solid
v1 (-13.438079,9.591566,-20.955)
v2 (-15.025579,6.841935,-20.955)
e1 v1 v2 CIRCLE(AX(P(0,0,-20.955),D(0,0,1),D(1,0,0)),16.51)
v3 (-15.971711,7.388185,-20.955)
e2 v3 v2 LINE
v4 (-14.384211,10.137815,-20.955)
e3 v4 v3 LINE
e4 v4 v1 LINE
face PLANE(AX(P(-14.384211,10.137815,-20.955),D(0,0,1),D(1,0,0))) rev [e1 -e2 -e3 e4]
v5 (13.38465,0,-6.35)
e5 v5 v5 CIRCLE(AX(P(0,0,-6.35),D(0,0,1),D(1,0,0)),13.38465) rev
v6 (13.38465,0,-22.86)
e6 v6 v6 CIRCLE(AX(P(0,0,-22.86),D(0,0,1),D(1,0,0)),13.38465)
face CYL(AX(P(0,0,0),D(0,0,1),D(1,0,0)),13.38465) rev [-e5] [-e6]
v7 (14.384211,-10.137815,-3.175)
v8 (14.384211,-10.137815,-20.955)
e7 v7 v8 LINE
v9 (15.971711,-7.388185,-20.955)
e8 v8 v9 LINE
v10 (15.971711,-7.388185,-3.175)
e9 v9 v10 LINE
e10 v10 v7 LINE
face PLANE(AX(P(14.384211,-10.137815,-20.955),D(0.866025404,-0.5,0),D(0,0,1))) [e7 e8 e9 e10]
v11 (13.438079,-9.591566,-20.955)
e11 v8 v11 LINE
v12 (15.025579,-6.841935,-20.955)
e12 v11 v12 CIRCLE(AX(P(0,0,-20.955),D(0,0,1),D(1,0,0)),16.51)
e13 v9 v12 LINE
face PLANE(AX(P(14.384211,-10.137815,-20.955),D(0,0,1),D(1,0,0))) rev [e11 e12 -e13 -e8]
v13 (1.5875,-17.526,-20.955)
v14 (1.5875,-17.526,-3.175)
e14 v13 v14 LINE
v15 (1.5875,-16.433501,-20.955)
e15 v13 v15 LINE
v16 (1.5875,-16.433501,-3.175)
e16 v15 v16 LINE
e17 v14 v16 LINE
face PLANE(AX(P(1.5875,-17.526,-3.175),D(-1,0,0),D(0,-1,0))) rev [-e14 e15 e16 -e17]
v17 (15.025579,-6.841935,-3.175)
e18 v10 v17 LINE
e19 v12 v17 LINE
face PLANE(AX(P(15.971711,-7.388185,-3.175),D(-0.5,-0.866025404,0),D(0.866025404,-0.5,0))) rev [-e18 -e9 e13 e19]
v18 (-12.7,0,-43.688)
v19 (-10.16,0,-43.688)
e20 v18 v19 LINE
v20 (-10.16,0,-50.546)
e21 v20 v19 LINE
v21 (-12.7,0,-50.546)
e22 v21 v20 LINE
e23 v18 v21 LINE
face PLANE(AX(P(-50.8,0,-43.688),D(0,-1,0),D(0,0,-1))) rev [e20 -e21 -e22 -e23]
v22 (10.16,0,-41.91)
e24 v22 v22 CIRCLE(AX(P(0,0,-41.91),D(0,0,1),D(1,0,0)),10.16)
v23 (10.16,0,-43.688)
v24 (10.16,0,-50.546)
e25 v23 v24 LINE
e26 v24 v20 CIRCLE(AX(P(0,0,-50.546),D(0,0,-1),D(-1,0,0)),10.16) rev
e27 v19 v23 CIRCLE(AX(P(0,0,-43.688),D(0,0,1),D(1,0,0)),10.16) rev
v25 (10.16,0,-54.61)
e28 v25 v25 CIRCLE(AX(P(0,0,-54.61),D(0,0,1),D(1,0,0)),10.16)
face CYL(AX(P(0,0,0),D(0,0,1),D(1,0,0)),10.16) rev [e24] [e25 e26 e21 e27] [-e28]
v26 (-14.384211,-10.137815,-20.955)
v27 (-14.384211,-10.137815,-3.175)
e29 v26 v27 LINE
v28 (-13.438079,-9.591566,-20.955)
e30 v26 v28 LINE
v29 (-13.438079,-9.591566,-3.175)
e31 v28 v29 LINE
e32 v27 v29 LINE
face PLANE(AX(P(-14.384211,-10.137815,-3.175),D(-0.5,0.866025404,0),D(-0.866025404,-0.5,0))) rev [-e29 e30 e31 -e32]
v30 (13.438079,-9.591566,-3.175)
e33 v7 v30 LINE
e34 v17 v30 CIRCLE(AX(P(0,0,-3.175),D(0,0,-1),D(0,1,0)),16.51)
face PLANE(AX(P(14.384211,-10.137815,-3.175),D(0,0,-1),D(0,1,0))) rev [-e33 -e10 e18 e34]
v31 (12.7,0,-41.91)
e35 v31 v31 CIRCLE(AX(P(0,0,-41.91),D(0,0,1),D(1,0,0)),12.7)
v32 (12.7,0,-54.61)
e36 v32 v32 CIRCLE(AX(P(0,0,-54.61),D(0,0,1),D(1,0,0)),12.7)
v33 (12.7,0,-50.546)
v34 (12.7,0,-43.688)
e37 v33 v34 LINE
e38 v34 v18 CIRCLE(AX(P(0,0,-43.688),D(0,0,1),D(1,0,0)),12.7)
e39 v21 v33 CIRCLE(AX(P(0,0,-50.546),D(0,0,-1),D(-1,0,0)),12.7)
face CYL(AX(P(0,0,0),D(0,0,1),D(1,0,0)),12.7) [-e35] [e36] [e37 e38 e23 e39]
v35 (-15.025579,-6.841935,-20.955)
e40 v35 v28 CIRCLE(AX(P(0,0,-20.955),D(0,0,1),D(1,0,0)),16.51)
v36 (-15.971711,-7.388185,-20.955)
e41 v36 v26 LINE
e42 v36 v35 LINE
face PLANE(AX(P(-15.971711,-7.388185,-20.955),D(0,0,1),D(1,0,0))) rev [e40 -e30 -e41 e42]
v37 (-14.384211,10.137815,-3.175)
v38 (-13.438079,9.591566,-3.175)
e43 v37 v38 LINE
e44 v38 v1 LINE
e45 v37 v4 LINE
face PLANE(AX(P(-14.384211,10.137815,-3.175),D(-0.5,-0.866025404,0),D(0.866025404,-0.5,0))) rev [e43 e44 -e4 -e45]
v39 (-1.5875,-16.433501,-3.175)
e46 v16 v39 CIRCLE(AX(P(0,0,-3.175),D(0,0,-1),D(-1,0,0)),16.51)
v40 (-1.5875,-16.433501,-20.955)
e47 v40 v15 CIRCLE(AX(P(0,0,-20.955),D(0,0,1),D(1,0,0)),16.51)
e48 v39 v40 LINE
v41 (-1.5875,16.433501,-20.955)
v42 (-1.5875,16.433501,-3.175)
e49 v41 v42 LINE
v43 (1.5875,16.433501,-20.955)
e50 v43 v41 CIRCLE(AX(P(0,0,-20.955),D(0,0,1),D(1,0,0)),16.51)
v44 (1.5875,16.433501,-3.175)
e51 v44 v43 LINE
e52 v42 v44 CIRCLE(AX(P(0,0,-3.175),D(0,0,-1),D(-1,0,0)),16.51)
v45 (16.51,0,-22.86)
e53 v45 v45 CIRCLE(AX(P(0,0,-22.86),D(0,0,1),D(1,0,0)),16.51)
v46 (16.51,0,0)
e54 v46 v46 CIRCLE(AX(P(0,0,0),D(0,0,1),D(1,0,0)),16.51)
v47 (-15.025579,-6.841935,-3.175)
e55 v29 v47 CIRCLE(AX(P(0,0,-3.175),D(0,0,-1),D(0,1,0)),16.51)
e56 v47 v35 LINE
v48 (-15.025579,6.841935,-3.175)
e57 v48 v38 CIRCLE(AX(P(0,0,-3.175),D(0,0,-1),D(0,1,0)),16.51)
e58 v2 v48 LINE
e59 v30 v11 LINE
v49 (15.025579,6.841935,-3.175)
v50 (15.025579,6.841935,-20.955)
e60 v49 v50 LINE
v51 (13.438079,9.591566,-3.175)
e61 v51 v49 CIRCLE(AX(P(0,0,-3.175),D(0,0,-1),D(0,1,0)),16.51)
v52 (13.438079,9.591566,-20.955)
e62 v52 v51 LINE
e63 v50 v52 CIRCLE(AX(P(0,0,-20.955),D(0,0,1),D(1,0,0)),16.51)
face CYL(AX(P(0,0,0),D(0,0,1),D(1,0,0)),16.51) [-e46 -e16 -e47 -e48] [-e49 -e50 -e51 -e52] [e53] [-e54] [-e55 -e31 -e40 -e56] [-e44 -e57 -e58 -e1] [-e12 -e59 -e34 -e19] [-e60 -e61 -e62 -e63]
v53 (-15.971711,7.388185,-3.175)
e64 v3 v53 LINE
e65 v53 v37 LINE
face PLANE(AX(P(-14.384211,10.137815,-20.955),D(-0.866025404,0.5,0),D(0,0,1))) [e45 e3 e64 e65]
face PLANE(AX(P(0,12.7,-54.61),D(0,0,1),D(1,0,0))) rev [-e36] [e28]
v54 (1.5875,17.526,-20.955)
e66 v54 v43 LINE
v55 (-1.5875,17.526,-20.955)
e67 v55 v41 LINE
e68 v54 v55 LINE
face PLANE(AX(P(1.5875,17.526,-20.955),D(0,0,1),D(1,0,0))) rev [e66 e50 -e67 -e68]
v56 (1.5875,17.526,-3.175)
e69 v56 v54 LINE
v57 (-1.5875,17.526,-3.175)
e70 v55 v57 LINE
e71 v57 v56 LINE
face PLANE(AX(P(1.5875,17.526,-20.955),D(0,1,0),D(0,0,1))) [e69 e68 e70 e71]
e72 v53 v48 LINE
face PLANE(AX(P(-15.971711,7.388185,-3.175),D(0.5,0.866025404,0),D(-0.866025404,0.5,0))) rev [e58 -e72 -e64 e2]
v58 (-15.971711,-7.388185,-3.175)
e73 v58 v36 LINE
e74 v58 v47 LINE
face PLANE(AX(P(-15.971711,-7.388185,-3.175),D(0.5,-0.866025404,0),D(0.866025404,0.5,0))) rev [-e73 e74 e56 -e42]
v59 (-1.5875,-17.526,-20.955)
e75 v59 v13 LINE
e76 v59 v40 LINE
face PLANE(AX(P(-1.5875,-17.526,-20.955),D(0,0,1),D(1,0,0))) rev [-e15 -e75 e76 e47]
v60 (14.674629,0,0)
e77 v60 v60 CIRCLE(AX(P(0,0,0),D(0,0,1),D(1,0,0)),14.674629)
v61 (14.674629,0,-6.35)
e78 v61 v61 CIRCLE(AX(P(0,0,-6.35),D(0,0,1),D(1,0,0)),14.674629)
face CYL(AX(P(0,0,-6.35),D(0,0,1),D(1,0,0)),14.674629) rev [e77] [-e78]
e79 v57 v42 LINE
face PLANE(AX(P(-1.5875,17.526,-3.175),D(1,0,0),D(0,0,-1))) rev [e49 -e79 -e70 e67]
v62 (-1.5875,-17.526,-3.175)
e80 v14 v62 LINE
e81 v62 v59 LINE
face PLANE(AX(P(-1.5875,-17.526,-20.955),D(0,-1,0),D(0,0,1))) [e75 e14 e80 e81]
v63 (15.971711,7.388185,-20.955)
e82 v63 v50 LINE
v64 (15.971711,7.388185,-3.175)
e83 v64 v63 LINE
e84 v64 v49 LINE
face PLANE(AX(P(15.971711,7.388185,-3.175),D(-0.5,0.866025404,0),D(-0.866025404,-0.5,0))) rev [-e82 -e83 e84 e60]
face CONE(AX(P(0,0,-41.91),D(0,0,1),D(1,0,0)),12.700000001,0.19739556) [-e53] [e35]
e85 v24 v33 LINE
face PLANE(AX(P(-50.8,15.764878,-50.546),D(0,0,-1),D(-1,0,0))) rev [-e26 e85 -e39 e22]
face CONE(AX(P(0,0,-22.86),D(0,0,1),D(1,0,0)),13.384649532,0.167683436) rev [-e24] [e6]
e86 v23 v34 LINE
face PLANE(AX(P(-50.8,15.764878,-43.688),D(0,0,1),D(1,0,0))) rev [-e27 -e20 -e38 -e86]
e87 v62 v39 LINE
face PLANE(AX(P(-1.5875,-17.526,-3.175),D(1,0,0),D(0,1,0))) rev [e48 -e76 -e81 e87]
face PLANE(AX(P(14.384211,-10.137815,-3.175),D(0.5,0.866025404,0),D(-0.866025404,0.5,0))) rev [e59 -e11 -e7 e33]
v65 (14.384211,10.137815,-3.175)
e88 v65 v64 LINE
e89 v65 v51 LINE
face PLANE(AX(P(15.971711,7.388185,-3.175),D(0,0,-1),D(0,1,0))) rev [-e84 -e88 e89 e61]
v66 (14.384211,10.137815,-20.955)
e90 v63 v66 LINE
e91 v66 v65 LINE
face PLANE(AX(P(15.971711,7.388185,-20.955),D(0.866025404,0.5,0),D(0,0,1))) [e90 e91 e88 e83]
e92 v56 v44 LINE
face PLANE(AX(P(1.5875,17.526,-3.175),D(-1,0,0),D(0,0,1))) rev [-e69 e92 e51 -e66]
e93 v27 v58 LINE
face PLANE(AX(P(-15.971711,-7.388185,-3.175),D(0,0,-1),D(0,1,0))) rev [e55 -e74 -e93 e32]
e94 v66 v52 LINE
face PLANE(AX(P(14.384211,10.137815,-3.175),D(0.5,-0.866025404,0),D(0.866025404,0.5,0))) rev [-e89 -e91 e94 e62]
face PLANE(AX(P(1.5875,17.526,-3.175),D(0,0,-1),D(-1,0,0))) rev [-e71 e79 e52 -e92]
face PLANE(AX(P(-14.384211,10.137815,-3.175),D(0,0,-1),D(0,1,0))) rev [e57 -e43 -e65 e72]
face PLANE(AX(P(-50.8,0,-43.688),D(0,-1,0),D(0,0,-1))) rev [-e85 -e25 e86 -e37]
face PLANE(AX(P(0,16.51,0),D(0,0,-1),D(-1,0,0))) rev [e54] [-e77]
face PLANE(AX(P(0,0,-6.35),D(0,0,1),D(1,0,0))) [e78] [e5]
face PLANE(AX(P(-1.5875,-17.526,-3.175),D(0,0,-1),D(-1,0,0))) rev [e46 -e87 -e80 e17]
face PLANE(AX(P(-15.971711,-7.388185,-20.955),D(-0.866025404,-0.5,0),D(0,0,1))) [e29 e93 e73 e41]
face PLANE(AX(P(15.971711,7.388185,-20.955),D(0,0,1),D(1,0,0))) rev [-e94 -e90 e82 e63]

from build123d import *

# Parameters (mm, degrees)
SKETCH3_R          = 14.674629281
CUT_EXTRUDE1_DEPTH = 6.35
SKETCH4_W          = 6.858
SKETCH4_H          = 15.764878236
CUT_EXTRUDE2_DEPTH = 50.8
SKETCH7_W          = 3.175
SKETCH7_H          = 17.78
FINGERGRIP_DEPTH   = 1.651
GRIPS_START        = -20.955
GRIPS_DEPTH        = 17.78


# Read off the part's stored shape, not the designer's step: grips
with BuildPart() as part:
    # Sketch1 → Revolve3 (revolve)
    with BuildSketch(Plane(origin=(0, 0, 0), x_dir=(0, 0, -1), z_dir=(1, 0, 0)), mode=Mode.PRIVATE) as revolve3_sk:
        Polygon((54.61, 12.700000001), (54.61, 10.16), (41.91, 10.16), (22.86, 13.384649532), (0, 13.384649532), (0, 16.51), (22.86, 16.51), (41.91, 12.700000001), align=None)
    revolve(revolve3_sk.sketch.rotate(Axis((0, 0, 0), (0, 0, -1)), 90), axis=Axis((0, 0, 0), (0, 0, -1)))

    # Sketch3 → Cut-Extrude1 (cut)
    with BuildSketch(Plane.XY):
        Circle(SKETCH3_R)
    extrude(amount=-CUT_EXTRUDE1_DEPTH, mode=Mode.SUBTRACT)

    # Sketch4 → Cut-Extrude2 (cut, symmetric)
    with BuildSketch(Plane(origin=(0, 0, 0), x_dir=(0, 0, -1), z_dir=(1, 0, 0))):
        with Locations((47.117, 7.882439118)):
            Rectangle(SKETCH4_W, SKETCH4_H)
    extrude(amount=CUT_EXTRUDE2_DEPTH, both=True, mode=Mode.SUBTRACT)

    # Sketch7 → fingerGrip (add)
    with BuildSketch(Plane(origin=(0, 15.875, 0), x_dir=(-1, 0, 0), z_dir=(0, 1, 0))):
        with Locations((0, -12.065)):
            Rectangle(SKETCH7_W, SKETCH7_H)
    extrude(amount=FINGERGRIP_DEPTH)

    # grips outline → grips (add)
    with BuildSketch(Plane.XY.offset(GRIPS_START)):
        with BuildLine():
            Line((1.5875, -17.526), (1.5875, -16.433500654))
            ThreePointArc((1.5875, -16.433500654), (0, -16.51), (-1.5875, -16.433500654))
            Line((-1.5875, -16.433500654), (-1.5875, -17.526))
            Line((-1.5875, -17.526), (1.5875, -17.526))
        make_face()
        with BuildLine():
            ThreePointArc((15.02557904, -6.841934999), (14.298079416, -8.255), (13.43807904, -9.591565656))
            Line((13.43807904, -9.591565656), (14.384211227, -10.137815329))
            Line((14.384211227, -10.137815329), (15.971711227, -7.388184671))
            Line((15.971711227, -7.388184671), (15.02557904, -6.841934999))
        make_face()
        with BuildLine():
            Line((-14.384211227, -10.137815329), (-13.43807904, -9.591565656))
            ThreePointArc((-13.43807904, -9.591565656), (-14.298079416, -8.255), (-15.02557904, -6.841934999))
            Line((-15.02557904, -6.841934999), (-15.971711227, -7.388184671))
            Line((-15.971711227, -7.388184671), (-14.384211227, -10.137815329))
        make_face()
        with BuildLine():
            Line((-15.971711227, 7.388184671), (-15.02557904, 6.841934999))
            ThreePointArc((-15.02557904, 6.841934999), (-14.298079416, 8.255), (-13.43807904, 9.591565656))
            Line((-13.43807904, 9.591565656), (-14.384211227, 10.137815329))
            Line((-14.384211227, 10.137815329), (-15.971711227, 7.388184671))
        make_face()
        with BuildLine():
            ThreePointArc((13.43807904, 9.591565656), (14.298079416, 8.255), (15.02557904, 6.841934999))
            Line((15.02557904, 6.841934999), (15.971711227, 7.388184671))
            Line((15.971711227, 7.388184671), (14.384211227, 10.137815329))
            Line((14.384211227, 10.137815329), (13.43807904, 9.591565656))
        make_face()
    extrude(amount=GRIPS_DEPTH)


solid = part.part
